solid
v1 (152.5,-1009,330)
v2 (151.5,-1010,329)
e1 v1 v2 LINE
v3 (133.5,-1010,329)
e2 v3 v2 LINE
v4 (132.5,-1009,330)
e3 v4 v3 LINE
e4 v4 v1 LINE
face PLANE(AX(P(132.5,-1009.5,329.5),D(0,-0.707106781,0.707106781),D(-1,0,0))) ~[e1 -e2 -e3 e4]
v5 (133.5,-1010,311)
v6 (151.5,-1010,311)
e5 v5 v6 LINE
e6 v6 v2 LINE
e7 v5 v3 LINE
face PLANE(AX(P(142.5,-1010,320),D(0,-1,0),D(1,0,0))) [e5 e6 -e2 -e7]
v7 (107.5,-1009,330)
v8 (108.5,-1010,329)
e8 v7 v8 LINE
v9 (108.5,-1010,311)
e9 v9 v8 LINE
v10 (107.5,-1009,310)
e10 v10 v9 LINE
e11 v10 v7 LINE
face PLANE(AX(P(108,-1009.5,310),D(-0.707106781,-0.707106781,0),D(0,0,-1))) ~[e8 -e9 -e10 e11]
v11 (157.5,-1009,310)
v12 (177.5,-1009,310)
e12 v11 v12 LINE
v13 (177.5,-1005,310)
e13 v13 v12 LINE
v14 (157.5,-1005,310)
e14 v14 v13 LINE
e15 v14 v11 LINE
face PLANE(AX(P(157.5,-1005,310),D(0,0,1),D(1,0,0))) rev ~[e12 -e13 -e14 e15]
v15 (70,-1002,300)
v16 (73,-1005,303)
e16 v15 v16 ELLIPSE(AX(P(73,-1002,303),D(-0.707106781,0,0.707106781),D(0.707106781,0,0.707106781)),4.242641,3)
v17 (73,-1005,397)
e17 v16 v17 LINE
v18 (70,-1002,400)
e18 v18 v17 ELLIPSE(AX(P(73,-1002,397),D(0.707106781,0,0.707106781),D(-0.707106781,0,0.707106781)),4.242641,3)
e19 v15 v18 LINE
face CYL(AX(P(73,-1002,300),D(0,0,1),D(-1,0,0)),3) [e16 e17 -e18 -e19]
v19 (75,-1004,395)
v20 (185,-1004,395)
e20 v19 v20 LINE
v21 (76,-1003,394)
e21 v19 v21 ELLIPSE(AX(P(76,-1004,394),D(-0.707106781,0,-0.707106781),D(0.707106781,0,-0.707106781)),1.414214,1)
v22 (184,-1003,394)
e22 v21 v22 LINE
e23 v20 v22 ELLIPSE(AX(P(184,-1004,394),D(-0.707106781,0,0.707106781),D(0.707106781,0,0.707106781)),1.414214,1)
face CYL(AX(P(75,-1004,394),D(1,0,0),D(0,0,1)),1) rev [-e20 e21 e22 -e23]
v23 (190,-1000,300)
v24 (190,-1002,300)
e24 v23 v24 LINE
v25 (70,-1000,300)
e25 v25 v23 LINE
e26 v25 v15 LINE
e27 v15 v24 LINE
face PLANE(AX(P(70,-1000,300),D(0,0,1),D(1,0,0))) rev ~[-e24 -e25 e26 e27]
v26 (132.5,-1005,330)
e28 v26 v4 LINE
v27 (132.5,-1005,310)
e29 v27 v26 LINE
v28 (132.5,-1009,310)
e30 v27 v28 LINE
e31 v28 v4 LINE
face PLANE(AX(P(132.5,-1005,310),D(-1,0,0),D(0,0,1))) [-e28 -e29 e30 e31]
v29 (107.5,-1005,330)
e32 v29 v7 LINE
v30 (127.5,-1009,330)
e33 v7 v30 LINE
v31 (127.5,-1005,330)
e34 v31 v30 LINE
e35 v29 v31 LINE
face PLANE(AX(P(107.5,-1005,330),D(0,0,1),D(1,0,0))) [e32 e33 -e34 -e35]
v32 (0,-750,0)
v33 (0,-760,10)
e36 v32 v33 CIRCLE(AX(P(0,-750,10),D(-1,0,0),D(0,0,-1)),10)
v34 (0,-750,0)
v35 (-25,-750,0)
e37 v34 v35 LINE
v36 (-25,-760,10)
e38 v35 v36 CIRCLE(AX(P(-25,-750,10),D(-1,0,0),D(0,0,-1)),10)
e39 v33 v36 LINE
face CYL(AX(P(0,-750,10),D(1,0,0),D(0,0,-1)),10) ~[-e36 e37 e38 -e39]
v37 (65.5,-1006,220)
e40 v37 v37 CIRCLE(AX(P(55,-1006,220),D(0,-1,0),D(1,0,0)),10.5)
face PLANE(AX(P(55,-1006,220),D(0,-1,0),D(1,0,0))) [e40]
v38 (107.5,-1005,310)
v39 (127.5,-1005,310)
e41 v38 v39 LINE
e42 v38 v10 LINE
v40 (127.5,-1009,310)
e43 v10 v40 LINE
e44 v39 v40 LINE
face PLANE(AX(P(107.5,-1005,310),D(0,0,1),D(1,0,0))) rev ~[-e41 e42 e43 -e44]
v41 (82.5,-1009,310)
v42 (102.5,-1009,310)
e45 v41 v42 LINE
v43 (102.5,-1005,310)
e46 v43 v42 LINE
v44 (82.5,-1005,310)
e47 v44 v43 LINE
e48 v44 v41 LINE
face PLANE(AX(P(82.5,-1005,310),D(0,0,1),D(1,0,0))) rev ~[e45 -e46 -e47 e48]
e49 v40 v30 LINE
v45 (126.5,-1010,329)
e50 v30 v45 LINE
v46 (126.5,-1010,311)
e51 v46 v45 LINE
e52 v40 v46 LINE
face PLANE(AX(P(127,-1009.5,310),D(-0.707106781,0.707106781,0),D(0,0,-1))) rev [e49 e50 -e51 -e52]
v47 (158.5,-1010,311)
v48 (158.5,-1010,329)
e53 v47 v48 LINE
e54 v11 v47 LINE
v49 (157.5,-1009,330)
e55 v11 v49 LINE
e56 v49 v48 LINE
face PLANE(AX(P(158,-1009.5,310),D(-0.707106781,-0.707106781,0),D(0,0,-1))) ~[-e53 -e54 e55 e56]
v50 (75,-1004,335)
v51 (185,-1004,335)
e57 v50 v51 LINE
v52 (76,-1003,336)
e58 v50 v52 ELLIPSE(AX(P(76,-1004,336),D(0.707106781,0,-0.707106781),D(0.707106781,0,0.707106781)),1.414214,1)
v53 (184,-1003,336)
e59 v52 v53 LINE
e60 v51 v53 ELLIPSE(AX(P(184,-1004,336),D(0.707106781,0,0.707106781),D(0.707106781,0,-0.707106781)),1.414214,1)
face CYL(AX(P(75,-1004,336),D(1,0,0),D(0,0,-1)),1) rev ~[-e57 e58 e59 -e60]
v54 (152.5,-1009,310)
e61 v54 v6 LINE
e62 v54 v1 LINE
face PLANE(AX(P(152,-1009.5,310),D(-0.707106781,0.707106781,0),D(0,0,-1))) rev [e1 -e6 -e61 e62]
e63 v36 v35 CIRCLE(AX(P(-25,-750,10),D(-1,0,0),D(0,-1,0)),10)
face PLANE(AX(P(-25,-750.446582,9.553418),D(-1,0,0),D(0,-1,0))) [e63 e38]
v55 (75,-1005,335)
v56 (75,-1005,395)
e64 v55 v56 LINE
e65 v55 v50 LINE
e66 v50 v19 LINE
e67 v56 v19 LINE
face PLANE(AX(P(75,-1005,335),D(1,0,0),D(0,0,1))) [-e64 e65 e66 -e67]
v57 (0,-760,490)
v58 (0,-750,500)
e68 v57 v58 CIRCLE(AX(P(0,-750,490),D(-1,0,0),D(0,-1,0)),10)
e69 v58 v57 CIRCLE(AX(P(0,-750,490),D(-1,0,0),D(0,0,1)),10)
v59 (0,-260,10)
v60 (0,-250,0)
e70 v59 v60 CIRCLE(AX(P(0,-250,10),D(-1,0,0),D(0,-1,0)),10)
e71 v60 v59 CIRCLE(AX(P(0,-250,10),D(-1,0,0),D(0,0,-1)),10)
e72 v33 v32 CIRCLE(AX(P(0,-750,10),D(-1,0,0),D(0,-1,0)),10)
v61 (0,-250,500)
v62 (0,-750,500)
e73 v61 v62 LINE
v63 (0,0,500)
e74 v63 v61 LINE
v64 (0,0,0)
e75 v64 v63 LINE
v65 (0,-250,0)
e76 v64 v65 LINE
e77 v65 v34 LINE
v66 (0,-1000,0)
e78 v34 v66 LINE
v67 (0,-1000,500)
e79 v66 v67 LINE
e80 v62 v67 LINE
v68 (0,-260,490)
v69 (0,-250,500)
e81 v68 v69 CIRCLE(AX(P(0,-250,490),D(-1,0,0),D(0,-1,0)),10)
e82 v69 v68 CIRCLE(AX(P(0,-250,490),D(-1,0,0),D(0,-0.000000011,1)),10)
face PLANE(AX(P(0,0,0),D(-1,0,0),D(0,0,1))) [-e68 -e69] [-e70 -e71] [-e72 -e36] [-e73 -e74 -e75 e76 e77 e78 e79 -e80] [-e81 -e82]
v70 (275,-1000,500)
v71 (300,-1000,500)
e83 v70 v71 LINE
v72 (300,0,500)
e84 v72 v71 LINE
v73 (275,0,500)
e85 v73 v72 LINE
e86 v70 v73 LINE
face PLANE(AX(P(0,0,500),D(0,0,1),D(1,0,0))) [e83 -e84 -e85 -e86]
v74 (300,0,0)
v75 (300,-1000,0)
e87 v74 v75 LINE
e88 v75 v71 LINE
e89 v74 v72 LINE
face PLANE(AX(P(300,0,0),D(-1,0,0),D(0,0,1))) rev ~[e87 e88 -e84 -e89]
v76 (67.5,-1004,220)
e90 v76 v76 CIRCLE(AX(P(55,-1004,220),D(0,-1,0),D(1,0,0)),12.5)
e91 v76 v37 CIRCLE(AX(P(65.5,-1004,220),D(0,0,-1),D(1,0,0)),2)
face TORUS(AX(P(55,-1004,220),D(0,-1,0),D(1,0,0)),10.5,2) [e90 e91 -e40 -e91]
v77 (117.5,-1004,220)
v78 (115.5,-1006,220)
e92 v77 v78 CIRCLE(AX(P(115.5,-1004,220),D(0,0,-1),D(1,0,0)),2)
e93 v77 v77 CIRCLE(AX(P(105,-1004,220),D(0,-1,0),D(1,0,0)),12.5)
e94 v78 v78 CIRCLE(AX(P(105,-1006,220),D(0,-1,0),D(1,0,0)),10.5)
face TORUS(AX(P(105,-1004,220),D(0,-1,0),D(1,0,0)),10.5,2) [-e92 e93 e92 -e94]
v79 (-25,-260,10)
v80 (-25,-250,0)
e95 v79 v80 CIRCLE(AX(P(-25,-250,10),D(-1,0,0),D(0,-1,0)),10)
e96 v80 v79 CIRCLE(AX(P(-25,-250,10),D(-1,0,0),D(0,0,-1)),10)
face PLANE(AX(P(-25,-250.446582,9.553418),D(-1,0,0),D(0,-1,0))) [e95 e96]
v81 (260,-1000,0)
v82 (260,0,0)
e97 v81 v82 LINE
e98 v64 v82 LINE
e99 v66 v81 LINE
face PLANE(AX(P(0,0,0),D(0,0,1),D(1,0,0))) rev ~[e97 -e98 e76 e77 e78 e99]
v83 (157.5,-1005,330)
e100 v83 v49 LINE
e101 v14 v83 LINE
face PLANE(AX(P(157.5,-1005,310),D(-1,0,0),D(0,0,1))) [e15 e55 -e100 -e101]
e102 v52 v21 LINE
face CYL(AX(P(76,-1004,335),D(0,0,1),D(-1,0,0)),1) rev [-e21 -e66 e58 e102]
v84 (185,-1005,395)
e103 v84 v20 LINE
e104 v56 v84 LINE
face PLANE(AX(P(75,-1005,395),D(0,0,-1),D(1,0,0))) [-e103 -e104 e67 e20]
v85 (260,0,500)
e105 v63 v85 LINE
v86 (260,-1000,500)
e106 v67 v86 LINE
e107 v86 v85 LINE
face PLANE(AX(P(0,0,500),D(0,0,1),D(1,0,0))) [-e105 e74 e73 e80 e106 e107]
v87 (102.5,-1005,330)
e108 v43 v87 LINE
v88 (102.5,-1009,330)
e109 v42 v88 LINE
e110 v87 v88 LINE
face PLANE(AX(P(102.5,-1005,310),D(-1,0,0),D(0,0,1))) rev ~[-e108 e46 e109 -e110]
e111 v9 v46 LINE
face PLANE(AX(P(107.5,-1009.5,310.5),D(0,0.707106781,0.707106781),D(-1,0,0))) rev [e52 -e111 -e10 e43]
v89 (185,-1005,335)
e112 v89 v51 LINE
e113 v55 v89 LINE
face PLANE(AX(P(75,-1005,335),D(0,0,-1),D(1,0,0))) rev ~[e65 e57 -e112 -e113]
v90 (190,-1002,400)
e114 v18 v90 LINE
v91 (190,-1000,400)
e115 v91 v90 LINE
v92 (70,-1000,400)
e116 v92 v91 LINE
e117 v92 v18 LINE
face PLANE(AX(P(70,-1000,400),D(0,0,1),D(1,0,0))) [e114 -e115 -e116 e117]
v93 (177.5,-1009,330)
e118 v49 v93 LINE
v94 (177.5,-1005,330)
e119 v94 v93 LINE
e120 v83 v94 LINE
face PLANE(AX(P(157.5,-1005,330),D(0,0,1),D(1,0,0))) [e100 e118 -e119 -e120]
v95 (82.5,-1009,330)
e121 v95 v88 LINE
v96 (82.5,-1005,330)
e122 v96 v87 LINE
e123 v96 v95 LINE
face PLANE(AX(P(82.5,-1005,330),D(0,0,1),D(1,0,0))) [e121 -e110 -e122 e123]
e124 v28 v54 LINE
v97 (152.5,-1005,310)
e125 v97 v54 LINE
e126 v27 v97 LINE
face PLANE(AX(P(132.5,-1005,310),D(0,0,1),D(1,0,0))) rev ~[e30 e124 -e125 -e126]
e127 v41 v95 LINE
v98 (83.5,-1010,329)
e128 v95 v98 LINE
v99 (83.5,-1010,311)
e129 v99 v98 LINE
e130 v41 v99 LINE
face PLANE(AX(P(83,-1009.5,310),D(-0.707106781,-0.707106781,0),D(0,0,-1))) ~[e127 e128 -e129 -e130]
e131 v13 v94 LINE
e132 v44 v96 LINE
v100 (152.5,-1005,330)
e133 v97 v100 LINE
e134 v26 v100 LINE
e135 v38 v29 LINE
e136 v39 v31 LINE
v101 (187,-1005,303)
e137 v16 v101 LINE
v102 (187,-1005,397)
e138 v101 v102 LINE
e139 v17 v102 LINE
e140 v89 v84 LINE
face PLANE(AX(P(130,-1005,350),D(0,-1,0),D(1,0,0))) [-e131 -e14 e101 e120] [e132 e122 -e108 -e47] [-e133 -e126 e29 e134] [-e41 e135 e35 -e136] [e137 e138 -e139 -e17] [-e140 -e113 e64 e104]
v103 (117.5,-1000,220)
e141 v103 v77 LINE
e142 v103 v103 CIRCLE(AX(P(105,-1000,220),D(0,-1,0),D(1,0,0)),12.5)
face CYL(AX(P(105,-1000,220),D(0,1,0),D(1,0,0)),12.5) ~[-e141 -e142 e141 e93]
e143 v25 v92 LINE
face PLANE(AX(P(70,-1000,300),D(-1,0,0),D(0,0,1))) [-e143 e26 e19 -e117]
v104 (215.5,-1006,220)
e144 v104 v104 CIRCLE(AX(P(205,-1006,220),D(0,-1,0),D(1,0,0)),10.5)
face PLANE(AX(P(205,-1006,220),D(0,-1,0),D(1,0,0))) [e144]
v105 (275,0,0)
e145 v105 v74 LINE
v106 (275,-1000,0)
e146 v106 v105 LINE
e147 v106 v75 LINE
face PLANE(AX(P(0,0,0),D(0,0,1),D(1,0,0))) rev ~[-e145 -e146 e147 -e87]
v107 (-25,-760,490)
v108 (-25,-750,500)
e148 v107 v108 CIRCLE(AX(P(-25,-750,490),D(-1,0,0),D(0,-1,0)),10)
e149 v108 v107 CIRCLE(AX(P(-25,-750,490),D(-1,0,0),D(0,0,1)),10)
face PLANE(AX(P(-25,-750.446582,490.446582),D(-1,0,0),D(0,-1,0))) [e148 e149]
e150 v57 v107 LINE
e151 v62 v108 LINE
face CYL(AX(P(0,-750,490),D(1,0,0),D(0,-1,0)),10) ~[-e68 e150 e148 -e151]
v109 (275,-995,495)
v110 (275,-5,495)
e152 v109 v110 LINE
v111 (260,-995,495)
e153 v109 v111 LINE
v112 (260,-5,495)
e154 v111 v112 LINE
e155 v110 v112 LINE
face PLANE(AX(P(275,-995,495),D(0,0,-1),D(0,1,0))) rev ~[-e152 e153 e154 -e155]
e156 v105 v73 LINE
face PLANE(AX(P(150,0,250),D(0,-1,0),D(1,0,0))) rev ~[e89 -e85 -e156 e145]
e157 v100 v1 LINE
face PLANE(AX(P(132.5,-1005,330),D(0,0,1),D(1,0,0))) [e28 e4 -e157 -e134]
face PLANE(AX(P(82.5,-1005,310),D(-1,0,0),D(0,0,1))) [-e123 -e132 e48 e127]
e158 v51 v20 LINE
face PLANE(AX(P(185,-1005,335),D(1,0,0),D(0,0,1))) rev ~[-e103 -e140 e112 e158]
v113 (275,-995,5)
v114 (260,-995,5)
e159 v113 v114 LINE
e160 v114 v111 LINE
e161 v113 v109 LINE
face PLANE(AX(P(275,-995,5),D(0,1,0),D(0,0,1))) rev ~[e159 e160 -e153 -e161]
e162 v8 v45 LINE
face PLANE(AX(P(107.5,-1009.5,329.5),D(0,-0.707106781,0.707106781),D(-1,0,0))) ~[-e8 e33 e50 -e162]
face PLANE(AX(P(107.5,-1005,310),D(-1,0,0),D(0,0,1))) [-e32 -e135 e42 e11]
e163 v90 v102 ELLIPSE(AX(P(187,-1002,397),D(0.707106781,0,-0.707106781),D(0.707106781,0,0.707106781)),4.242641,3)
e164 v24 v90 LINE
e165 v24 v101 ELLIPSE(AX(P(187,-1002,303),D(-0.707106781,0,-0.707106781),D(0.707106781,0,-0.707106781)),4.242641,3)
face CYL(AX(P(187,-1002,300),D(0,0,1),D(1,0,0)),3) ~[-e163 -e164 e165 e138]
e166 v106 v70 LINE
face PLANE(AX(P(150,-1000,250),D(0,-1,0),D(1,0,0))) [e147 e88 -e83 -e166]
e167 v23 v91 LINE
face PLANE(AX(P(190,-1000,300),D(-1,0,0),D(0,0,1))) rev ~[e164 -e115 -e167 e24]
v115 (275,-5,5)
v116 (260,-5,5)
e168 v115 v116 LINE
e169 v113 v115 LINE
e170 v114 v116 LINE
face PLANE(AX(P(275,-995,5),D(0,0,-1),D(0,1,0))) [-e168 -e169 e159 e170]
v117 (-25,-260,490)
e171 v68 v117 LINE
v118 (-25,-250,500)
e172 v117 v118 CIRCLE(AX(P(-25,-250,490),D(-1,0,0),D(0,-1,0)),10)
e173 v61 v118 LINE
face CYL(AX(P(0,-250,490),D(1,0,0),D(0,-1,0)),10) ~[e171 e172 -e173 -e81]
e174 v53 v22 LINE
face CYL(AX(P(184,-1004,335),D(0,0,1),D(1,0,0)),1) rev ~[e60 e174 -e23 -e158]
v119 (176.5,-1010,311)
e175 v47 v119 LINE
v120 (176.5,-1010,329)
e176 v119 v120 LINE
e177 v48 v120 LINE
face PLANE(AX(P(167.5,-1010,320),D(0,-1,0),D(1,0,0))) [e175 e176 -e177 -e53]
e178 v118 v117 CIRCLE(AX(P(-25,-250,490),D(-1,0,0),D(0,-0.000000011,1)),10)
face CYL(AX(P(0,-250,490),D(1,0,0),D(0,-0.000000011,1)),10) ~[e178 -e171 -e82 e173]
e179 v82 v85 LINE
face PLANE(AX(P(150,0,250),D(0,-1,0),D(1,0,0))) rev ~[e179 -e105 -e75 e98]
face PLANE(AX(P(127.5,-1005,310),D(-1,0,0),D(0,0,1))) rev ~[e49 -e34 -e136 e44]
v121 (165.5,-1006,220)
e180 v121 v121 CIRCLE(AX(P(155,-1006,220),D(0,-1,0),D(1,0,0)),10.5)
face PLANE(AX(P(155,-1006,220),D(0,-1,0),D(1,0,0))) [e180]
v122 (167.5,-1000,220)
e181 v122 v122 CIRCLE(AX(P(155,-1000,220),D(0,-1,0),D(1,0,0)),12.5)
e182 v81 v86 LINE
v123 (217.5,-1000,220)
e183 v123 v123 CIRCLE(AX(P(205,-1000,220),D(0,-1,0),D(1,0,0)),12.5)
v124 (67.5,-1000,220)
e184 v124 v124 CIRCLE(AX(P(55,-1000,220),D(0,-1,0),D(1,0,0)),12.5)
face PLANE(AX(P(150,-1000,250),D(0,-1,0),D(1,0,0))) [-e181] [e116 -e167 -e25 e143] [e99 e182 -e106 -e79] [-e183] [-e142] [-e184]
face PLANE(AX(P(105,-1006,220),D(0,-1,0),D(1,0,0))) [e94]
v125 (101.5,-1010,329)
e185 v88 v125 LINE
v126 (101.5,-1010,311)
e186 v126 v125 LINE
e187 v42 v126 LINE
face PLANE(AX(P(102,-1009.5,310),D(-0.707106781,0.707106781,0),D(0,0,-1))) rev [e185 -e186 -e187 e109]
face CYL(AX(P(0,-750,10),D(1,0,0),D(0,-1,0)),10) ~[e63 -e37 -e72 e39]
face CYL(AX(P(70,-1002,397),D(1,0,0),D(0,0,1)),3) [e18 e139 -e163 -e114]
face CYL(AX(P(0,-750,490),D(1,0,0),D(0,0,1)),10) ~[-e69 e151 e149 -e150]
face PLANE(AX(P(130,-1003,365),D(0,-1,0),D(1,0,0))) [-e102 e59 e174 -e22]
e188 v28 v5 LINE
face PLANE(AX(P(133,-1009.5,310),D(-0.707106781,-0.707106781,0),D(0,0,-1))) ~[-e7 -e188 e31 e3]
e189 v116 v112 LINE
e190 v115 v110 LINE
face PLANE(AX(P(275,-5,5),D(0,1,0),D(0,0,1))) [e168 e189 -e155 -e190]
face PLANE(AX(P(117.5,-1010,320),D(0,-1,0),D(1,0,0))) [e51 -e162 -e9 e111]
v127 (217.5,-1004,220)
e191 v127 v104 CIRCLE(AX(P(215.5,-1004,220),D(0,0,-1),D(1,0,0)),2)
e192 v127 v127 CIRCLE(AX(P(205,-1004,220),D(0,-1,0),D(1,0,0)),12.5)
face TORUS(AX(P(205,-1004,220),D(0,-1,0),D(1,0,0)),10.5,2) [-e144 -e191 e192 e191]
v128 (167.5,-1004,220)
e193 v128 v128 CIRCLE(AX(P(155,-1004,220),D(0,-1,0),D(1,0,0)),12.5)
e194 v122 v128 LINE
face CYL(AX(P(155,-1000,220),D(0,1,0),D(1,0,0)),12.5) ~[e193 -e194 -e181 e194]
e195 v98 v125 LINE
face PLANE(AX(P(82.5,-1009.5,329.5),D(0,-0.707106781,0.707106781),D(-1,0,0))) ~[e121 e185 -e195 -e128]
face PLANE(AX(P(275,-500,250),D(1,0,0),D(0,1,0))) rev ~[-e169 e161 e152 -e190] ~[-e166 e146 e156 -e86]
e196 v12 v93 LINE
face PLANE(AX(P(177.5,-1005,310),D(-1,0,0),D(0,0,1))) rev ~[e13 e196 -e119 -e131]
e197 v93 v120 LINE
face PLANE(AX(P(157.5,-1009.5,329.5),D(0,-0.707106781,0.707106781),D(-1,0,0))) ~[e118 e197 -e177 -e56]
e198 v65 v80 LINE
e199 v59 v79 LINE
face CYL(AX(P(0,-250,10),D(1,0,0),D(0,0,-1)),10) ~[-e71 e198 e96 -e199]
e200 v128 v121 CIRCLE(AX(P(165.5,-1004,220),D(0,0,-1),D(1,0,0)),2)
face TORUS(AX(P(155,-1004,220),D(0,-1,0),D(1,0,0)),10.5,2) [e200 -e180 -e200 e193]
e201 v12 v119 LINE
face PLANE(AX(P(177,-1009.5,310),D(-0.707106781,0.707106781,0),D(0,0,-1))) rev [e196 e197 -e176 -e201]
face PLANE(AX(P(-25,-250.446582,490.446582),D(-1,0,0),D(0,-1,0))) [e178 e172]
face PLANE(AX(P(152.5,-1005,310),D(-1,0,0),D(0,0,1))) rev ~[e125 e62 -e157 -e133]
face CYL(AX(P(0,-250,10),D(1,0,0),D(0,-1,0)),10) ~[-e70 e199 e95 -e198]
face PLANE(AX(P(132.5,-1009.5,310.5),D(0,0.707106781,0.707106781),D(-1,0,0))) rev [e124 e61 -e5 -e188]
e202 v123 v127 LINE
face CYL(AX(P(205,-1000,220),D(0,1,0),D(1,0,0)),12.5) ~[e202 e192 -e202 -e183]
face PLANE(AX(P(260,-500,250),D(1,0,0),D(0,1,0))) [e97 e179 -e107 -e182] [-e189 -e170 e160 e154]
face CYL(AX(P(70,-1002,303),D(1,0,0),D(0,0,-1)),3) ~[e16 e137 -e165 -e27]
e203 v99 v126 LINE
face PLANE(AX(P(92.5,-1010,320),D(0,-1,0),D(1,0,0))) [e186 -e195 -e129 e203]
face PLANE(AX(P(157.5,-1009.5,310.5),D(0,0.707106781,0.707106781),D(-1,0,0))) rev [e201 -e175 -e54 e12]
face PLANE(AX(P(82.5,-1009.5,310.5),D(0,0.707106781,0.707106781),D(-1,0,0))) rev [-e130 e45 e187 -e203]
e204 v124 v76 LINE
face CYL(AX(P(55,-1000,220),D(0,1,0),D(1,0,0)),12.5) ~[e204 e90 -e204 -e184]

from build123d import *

# Parameters (mm, degrees)
F0_W      = 300
F0_H      = 500
F1_DEPTH  = 1000
F3_W      = 1000
F3_H      = 500
F3_W_2    = 990
F3_H_2    = 490
F4_DEPTH  = 15
F6_DEPTH  = 25
F7_W      = 120
F7_H      = 100
F8_DEPTH  = 5
F9_W      = 20
F9_H      = 20
F10_DEPTH = 5
F11_W     = 110
F11_H     = 60
F12_DEPTH = 2
F14_R     = 12.5
F15_DEPTH = 6
F16_R     = 2
F17_R     = 3
F18_SIZE  = 1
F19_R     = 1


with BuildPart() as f1:
    # F0 (on Front) → F1 (new body)
    with BuildSketch(Plane.XZ):
        with Locations((150, 250)):
            Rectangle(F0_W, F0_H)
    extrude(amount=F1_DEPTH)

    # F3 (on offset) → F4 (cut)
    with BuildSketch(Plane.YZ.offset(275)):
        with Locations((-500, 250)):
            Rectangle(F3_W, F3_H)
        with Locations((-500, 250)):
            Rectangle(F3_W_2, F3_H_2, mode=Mode.SUBTRACT)
    extrude(amount=-F4_DEPTH, mode=Mode.SUBTRACT)

    # F5 (on face) → F6 (join)
    with BuildSketch(Plane(origin=(0, 0, 0), x_dir=(0, -1, 0), z_dir=(-1, 0, 0))):
        with BuildLine():
            ThreePointArc((250.000000113, 500), (242.9289321482, 482.9289322281), (260, 490))
            ThreePointArc((260, 490), (257.0710678518, 497.0710677719), (250.000000113, 500))
        make_face()
        with BuildLine():
            ThreePointArc((260, 10), (242.9289321881, 17.0710678119), (250, 0))
            ThreePointArc((250, 0), (257.0710678119, 2.9289321881), (260, 10))
        make_face()
        with BuildLine():
            ThreePointArc((760, 10), (742.9289321881, 17.0710678119), (750, 0))
            ThreePointArc((750, 0), (757.0710678119, 2.9289321881), (760, 10))
        make_face()
        with BuildLine():
            ThreePointArc((760, 490), (757.0710678119, 497.0710678119), (750, 500))
            ThreePointArc((750, 500), (742.9289321881, 482.9289321881), (760, 490))
        make_face()
    extrude(amount=F6_DEPTH)

    # F7 (on face) → F8 (join)
    with BuildSketch(Plane.XZ.offset(1000)):
        with Locations((130, 350)):
            Rectangle(F7_W, F7_H)
    extrude(amount=F8_DEPTH)

    # F9 (on face) → F10 (join)
    with BuildSketch(Plane.XZ.offset(1005)):
        with Locations((92.5, 320)):
            Rectangle(F9_W, F9_H)
        with Locations((117.5, 320)):
            Rectangle(F9_W, F9_H)
        with Locations((142.5, 320)):
            Rectangle(F9_W, F9_H)
        with Locations((167.5, 320)):
            Rectangle(F9_W, F9_H)
    extrude(amount=F10_DEPTH)

    # F11 (on face) → F12 (cut)
    with BuildSketch(Plane.XZ.offset(1005)):
        with Locations((130, 365)):
            Rectangle(F11_W, F11_H)
    extrude(amount=-F12_DEPTH, mode=Mode.SUBTRACT)

    # F14 (on face) → F15 (join)
    with BuildSketch(Plane.XZ.offset(1000)):
        with Locations((55, 220)):
            Circle(F14_R)
        with Locations((105, 220)):
            Circle(F14_R)
        with Locations((155, 220)):
            Circle(F14_R)
        with Locations((205, 220)):
            Circle(F14_R)
    extrude(amount=F15_DEPTH)

    # F16
    f16_edges = [f1.edges().sort_by_distance(p)[0] for p in [
        (42.5, -1006, 220),
        (92.5, -1006, 220),
        (142.5, -1006, 220),
        (192.5, -1006, 220),
    ]]
    fillet(f16_edges, radius=F16_R)

    # F17
    f17_edges = [f1.edges().sort_by_distance(p)[0] for p in [
        (70, -1005, 350),
        (130, -1005, 300),
        (190, -1005, 350),
        (130, -1005, 400),
    ]]
    fillet(f17_edges, radius=F17_R)

    # F18
    f18_edges = [f1.edges().sort_by_distance(p)[0] for p in [
        (92.5, -1010, 330),
        (82.5, -1010, 320),
        (92.5, -1010, 310),
        (102.5, -1010, 320),
        (117.5, -1010, 330),
        (107.5, -1010, 320),
        (117.5, -1010, 310),
        (127.5, -1010, 320),
        (142.5, -1010, 330),
        (132.5, -1010, 320),
        (142.5, -1010, 310),
        (152.5, -1010, 320),
        (167.5, -1010, 330),
        (157.5, -1010, 320),
        (167.5, -1010, 310),
        (177.5, -1010, 320),
    ]]
    chamfer(f18_edges, length=F18_SIZE)

    # F19
    f19_edges = [f1.edges().sort_by_distance(p)[0] for p in [
        (130, -1003, 395),
        (75, -1003, 365),
        (130, -1003, 335),
        (185, -1003, 365),
    ]]
    fillet(f19_edges, radius=F19_R)


solid = f1.part
